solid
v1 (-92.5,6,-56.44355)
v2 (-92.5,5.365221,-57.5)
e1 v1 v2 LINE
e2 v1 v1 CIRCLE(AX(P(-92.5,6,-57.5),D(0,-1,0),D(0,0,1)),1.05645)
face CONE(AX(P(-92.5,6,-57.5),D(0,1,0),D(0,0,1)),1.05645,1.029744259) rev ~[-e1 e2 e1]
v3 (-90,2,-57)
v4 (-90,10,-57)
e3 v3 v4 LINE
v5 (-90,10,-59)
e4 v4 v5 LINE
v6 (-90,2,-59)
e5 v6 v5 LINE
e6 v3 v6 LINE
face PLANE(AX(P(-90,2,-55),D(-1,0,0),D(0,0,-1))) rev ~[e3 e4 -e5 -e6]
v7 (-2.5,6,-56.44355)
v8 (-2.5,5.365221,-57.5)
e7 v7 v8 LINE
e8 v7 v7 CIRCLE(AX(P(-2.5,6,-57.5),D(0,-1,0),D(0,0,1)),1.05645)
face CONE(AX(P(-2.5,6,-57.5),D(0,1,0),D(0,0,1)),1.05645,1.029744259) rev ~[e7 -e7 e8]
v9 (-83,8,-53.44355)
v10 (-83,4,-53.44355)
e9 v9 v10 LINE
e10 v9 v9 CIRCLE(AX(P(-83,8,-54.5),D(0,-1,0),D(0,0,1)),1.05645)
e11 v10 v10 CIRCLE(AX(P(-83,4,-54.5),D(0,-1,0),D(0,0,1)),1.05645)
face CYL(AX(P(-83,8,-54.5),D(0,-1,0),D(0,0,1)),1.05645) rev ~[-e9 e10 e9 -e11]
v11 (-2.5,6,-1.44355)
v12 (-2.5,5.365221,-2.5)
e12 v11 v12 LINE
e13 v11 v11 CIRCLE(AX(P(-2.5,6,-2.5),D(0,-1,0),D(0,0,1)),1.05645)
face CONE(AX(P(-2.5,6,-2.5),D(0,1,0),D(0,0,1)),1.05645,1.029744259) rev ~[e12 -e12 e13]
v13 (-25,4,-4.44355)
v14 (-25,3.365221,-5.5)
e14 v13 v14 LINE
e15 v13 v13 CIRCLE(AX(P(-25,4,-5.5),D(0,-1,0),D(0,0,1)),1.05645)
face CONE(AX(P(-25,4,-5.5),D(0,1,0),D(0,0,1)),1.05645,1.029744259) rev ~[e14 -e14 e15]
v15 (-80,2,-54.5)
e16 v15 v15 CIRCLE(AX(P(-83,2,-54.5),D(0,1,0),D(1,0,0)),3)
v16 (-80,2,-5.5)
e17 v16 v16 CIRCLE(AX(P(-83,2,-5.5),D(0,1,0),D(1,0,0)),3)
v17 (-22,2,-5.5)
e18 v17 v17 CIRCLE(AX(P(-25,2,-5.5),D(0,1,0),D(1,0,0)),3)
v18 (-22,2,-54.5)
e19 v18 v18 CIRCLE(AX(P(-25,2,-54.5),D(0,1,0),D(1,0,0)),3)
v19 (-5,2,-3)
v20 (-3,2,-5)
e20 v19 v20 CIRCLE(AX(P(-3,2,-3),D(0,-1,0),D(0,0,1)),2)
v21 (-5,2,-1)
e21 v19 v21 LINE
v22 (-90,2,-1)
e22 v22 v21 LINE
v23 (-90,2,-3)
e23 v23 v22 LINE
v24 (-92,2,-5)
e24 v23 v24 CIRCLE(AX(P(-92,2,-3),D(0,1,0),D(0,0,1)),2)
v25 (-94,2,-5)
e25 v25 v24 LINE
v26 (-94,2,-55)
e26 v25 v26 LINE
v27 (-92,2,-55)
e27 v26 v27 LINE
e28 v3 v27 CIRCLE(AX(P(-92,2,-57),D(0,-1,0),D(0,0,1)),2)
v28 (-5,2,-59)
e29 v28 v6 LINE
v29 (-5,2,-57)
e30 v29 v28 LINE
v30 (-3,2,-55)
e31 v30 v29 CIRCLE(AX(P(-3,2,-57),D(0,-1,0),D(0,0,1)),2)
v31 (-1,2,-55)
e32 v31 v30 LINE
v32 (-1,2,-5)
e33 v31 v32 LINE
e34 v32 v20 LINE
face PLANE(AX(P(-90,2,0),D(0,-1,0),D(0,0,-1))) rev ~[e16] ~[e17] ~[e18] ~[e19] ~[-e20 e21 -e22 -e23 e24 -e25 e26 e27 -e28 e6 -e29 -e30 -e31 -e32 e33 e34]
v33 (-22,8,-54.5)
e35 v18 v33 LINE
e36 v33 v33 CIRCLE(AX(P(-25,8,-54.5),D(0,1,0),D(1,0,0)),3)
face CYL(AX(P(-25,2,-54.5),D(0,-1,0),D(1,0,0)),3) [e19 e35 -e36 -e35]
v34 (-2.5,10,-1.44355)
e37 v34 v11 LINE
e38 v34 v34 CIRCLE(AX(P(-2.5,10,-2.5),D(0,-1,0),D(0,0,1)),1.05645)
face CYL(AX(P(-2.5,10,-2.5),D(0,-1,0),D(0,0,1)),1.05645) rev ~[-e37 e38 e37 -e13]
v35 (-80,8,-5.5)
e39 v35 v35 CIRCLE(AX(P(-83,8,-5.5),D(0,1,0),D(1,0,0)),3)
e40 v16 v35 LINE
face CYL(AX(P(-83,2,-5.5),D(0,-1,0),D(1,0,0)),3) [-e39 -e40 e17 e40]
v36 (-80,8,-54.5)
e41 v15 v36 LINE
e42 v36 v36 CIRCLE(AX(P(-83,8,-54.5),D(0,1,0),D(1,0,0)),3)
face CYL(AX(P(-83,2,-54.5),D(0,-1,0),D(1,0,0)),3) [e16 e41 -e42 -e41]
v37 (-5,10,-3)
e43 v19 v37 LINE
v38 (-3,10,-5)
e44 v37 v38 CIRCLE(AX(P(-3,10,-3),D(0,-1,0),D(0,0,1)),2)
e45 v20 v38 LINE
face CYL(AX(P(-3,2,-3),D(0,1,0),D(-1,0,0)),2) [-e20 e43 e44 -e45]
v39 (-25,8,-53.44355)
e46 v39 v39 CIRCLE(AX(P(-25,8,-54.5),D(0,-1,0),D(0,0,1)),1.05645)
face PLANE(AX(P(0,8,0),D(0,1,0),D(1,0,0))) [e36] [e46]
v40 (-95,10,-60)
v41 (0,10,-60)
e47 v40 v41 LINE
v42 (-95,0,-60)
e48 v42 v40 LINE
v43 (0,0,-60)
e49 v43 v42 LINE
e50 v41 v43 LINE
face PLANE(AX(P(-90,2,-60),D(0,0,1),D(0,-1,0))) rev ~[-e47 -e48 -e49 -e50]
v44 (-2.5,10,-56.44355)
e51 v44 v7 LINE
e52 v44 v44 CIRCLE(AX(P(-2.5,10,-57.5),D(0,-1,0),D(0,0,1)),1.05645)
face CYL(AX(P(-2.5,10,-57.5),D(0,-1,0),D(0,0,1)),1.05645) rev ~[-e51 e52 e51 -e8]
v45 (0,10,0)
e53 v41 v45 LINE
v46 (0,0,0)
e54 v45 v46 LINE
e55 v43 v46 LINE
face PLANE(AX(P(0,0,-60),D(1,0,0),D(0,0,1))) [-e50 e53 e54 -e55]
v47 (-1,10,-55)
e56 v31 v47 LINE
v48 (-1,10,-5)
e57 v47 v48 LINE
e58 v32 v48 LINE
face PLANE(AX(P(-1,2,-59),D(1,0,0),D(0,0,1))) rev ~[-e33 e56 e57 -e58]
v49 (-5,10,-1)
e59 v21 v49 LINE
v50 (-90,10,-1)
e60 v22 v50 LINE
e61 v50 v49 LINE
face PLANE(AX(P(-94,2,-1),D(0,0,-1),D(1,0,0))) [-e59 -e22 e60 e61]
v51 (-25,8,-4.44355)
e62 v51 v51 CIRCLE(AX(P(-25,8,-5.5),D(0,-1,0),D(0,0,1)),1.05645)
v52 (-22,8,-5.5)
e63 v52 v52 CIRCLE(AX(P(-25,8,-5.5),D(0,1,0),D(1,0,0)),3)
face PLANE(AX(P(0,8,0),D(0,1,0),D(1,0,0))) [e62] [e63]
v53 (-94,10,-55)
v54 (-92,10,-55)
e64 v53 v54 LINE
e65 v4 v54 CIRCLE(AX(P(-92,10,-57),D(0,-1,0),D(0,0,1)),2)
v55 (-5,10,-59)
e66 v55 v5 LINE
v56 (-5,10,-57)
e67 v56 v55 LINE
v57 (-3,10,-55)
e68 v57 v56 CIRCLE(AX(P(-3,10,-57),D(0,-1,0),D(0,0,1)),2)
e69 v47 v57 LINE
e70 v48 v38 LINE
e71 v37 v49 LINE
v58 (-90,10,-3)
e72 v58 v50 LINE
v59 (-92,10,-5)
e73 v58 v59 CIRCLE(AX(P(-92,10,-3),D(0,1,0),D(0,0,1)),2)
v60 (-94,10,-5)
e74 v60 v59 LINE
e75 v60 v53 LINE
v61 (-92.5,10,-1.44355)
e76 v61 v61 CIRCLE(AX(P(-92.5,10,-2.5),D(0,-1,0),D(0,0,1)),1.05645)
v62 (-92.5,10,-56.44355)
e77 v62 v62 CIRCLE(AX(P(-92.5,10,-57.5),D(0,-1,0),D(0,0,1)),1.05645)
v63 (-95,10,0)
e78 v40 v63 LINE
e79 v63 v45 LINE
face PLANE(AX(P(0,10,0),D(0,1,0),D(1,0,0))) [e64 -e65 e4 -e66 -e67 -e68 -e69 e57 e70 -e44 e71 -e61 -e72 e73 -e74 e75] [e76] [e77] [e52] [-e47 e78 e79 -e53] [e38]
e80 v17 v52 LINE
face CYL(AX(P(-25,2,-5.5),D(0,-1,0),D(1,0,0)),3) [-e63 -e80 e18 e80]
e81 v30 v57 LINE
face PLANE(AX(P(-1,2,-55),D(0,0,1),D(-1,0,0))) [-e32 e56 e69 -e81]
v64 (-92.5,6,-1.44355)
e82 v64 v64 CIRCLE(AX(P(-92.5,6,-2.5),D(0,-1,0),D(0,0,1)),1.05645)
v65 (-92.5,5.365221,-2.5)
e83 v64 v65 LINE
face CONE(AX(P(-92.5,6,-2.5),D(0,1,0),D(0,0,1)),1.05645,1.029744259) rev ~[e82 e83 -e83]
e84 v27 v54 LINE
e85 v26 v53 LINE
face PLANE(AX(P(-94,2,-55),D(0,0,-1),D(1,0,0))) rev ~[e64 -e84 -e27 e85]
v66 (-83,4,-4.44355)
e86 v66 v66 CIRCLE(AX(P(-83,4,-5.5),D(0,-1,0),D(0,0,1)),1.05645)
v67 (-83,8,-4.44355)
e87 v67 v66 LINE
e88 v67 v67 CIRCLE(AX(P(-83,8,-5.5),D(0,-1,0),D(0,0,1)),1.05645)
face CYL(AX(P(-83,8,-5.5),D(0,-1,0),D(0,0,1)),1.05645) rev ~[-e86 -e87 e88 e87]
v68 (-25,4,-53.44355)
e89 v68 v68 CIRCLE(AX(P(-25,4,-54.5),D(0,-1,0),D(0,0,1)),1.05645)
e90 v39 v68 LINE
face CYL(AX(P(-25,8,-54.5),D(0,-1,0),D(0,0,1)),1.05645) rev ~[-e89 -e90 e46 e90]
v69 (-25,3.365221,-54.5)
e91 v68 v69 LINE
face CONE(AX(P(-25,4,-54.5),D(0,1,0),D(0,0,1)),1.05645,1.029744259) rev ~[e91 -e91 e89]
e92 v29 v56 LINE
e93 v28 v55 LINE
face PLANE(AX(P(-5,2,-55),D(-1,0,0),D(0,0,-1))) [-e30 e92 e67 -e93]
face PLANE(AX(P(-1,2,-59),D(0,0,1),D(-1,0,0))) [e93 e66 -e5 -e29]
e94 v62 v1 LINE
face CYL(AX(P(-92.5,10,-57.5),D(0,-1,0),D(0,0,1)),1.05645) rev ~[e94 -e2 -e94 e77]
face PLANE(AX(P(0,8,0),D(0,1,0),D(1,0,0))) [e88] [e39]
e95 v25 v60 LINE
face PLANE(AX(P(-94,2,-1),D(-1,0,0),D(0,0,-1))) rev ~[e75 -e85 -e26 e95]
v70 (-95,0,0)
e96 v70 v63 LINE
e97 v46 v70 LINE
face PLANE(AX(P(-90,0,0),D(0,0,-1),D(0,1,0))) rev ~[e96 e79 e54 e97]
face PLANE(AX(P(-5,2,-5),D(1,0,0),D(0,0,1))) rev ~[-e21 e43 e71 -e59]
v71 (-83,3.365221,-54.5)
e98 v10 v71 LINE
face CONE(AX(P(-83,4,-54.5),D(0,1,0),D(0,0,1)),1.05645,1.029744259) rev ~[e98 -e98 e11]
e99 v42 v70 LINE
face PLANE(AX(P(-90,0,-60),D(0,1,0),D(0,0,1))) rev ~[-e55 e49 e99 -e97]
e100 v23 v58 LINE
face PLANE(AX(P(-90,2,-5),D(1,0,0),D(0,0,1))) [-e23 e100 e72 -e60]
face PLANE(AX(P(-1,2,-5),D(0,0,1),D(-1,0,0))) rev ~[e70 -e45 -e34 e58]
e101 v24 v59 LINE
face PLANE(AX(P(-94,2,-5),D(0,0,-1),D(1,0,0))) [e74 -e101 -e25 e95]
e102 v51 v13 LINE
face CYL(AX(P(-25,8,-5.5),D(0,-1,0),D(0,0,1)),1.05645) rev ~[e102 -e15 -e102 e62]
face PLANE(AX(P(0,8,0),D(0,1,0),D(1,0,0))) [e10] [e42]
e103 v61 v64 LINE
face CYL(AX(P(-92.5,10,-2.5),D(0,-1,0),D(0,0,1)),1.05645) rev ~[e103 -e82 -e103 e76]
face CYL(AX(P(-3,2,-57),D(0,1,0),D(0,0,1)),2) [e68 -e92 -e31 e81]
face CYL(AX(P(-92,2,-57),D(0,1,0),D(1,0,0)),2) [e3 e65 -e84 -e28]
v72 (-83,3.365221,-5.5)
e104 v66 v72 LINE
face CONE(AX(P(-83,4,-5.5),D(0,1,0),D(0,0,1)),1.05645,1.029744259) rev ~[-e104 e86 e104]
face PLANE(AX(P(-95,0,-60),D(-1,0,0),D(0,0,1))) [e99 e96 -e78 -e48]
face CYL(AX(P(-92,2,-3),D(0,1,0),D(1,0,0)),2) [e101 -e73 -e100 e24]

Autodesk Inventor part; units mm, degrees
ref_plane "YZ Plane" through (0, 0, 0) normal (1, 0, 0) x (0, 1, 0)
ref_plane "XZ Plane" through (0, 0, 0) normal (0, 1, 0) x (-1, 0, 0)
ref_plane "XY Plane" through (0, 0, 0) normal (0, 0, 1) x (1, 0, 0)
sketch "Szkic1" plane through (0, 0, 0) normal (0, 1, 0) x (-1, 0, 0)
  line L0 (0, 0) -> (90, 0)
  line L1 (90, 0) -> (90, -60)
  line L2 (90, -60) -> (0, -60)
  line L3 (0, -60) -> (0, 0)
  dimension "d0" = 90
  dimension "d1" = 60
extrude "Wyciągnięcie proste1" add sketch "Szkic1" along normal blind 2
sketch "Szkic10" plane through (0, 2, 0) normal (0, 1, 0) x (1, 0, 0)
  circle A0 centre (-83, 54.5) radius 3
  circle A1 centre (-25, 54.5) radius 3
  circle A2 centre (-25, 5.5) radius 3
  circle A3 centre (-83, 5.5) radius 3
  point P0 (0, 0)
  dimension "d21" = 6
  dimension "d22" = 6
  dimension "d23" = 6
  dimension "d24" = 6
extrude "Wyciągnięcie proste4" add sketch "Szkic10" along normal blind 6
sketch "Szkic11" plane through (-83, 8, -54.5) normal (0, 1, 0) x (1, 0, 0)
  circle A0 centre (0, 0) radius 3 projected
  point P0 (83, -54.5)
hole "Otwór1" at (-83, 8, -54.5) direction (0, -1, 0) diameter 2.1129 depth 4 tip angle 118 counterbore diameter 2.7 counterbore depth 0 thread size "M2.6x0.45" class "6H" standard "ISO Metric profile"
sketch "Szkic12" plane through (-83, 8, -5.5) normal (0, 1, 0) x (1, 0, 0)
  circle A0 centre (0, 0) radius 3 projected
  point P0 (83, -5.5)
hole "Otwór2" at (-83, 8, -5.5) direction (0, -1, 0) diameter 2.1129 depth 4 tip angle 118 counterbore diameter 2.7 counterbore depth 0 thread size "M2.6x0.45" class "6H" standard "ISO Metric profile"
sketch "Szkic13" plane through (-25, 8, -54.5) normal (0, 1, 0) x (1, 0, 0)
  point P0 (25, -54.5)
  point P1 (0, 0)
  point P2 (0, 0)
hole "Otwór3" at (-25, 8, -54.5) direction (0, -1, 0) diameter 2.1129 depth 4 tip angle 118 counterbore diameter 2.7 counterbore depth 0 thread size "M2.6x0.45" class "6H" standard "ISO Metric profile"
sketch "Szkic14" plane through (-25, 8, -5.5) normal (0, 1, 0) x (1, 0, 0)
  point P0 (25, -5.5)
  point P1 (0, 0)
  point P2 (0, 0)
hole "Otwór4" at (-25, 8, -5.5) direction (0, -1, 0) diameter 2.1129 depth 4 tip angle 118 counterbore diameter 2.7 counterbore depth 0 thread size "M2.6x0.45" class "6H" standard "ISO Metric profile"
sketch "Szkic15" plane through (-90, 0, -60) normal (-1, 0, 0) x (0, 0, 1)
  line L0 (0, 0) -> (60, 0)
  line L1 (60, 0) -> (60, 2)
  line L2 (60, 2) -> (0, 2)
  line L3 (0, 2) -> (0, 0)
extrude "Wyciągnięcie proste5" add sketch "Szkic15" along normal blind 5
sketch "Szkic16" plane through (0, 2, 0) normal (0, 1, 0) x (1, 0, 0)
  line L0 (0, 60) -> (-95, 60) projected
  line L1 (-95, 60) -> (-95, 0) projected
  line L2 (-94, 60) -> (-95, 60)
  line L3 (-95, 60) -> (-95, 0)
  line L4 (-95, 0) -> (-94, 0)
  line L5 (-94, 0) -> (-94, 60)
  line L6 (-95, 1) -> (0, 1)
  line L7 (0, 1) -> (0, 0)
  line L8 (0, 0) -> (-95, 0)
  line L9 (-95, 0) -> (-95, 1)
  line L10 (-1, 0) -> (0, 0)
  line L11 (0, 0) -> (0, 60)
  line L12 (0, 60) -> (-1, 60)
  line L13 (-1, 60) -> (-1, 0)
  line L14 (-1, 59) -> (-95, 59)
  line L15 (-95, 59) -> (-95, 60)
  line L16 (-95, 60) -> (-1, 60)
  line L17 (-1, 60) -> (-1, 59)
  point P0 (-94, 59)
  point P1 (-1, 1)
  point P2 (-94, 1)
extrude "Wyciągnięcie proste6" add sketch "Szkic16" along normal blind 8 contours L11 L6 L13 L0 | L13 L14 L5 L0 | L7 L8 L13 L6 | L5 L14 L1 L0 | L13 L8 L5 L6 | L5 L6 L1 L14 | L5 L4 L1 L6
sketch "Szkic21" plane through (0, 2, 0) normal (0, 1, 0) x (1, 0, 0)
  line L0 (-1, 59) -> (-1, 1) projected
  line L1 (-94, 1) -> (-1, 1) projected
  line L2 (-1, 5) -> (-5, 5)
  line L3 (-5, 5) -> (-5, 1)
  line L4 (-5, 1) -> (-1, 1)
  line L5 (-1, 1) -> (-1, 5)
  point P0 (0, 0)
  dimension "d61" = 4
extrude "Wyciągnięcie proste8" add sketch "Szkic21" along normal blind 8
sketch "Szkic22" plane through (0, 2, 0) normal (0, 1, 0) x (1, 0, 0)
  line L0 (-1, 59) -> (-1, 5) projected
  line L1 (-1, 55) -> (-5, 55)
  line L2 (-5, 55) -> (-5, 59)
  line L3 (-5, 59) -> (-1, 59)
  line L4 (-1, 59) -> (-1, 55)
  line L5 (-94, 1) -> (-94, 59) projected
  line L6 (-1, 59) -> (-94, 59) projected
  line L7 (-94, 55) -> (-90, 55)
  line L8 (-90, 55) -> (-90, 59)
  line L9 (-90, 59) -> (-94, 59)
  line L10 (-94, 59) -> (-94, 55)
  line L11 (-94, 1) -> (-5, 1) projected
  line L12 (-94, 5) -> (-90, 5)
  line L13 (-90, 5) -> (-90, 1)
  line L14 (-90, 1) -> (-94, 1)
  line L15 (-94, 1) -> (-94, 5)
  point P0 (0, 0)
  dimension "d64" = 4
  dimension "d65" = 4
extrude "Wyciągnięcie proste9" add sketch "Szkic22" along normal blind 8
fillet "Zaokrąglenie1" radius 2 4 edges at (-90, 6, -55) (-5, 6, -55) (-90, 6, -5) (-5, 6, -5)
sketch "Szkic23" plane through (0, 10, 0) normal (0, 1, 0) x (1, 0, 0)
  point P0 (0, 0)
  point P1 (-2.5, 2.5)
  point P2 (-92.5, 2.5)
  point P3 (-92.5, 57.5)
  point P4 (-2.5, 57.5)
hole "Otwór5" at (-2.5, 10, -2.5) at (-92.5, 10, -2.5) at (-92.5, 10, -57.5) at (-2.5, 10, -57.5) direction (0, -1, 0) diameter 2.1129 depth 4 tip angle 118 counterbore diameter 2.7 counterbore depth 0 thread size "M2.6x0.45" class "6H" standard "ISO Metric profile"
equation "\"d25\" = d22"
properties part number "dol"
